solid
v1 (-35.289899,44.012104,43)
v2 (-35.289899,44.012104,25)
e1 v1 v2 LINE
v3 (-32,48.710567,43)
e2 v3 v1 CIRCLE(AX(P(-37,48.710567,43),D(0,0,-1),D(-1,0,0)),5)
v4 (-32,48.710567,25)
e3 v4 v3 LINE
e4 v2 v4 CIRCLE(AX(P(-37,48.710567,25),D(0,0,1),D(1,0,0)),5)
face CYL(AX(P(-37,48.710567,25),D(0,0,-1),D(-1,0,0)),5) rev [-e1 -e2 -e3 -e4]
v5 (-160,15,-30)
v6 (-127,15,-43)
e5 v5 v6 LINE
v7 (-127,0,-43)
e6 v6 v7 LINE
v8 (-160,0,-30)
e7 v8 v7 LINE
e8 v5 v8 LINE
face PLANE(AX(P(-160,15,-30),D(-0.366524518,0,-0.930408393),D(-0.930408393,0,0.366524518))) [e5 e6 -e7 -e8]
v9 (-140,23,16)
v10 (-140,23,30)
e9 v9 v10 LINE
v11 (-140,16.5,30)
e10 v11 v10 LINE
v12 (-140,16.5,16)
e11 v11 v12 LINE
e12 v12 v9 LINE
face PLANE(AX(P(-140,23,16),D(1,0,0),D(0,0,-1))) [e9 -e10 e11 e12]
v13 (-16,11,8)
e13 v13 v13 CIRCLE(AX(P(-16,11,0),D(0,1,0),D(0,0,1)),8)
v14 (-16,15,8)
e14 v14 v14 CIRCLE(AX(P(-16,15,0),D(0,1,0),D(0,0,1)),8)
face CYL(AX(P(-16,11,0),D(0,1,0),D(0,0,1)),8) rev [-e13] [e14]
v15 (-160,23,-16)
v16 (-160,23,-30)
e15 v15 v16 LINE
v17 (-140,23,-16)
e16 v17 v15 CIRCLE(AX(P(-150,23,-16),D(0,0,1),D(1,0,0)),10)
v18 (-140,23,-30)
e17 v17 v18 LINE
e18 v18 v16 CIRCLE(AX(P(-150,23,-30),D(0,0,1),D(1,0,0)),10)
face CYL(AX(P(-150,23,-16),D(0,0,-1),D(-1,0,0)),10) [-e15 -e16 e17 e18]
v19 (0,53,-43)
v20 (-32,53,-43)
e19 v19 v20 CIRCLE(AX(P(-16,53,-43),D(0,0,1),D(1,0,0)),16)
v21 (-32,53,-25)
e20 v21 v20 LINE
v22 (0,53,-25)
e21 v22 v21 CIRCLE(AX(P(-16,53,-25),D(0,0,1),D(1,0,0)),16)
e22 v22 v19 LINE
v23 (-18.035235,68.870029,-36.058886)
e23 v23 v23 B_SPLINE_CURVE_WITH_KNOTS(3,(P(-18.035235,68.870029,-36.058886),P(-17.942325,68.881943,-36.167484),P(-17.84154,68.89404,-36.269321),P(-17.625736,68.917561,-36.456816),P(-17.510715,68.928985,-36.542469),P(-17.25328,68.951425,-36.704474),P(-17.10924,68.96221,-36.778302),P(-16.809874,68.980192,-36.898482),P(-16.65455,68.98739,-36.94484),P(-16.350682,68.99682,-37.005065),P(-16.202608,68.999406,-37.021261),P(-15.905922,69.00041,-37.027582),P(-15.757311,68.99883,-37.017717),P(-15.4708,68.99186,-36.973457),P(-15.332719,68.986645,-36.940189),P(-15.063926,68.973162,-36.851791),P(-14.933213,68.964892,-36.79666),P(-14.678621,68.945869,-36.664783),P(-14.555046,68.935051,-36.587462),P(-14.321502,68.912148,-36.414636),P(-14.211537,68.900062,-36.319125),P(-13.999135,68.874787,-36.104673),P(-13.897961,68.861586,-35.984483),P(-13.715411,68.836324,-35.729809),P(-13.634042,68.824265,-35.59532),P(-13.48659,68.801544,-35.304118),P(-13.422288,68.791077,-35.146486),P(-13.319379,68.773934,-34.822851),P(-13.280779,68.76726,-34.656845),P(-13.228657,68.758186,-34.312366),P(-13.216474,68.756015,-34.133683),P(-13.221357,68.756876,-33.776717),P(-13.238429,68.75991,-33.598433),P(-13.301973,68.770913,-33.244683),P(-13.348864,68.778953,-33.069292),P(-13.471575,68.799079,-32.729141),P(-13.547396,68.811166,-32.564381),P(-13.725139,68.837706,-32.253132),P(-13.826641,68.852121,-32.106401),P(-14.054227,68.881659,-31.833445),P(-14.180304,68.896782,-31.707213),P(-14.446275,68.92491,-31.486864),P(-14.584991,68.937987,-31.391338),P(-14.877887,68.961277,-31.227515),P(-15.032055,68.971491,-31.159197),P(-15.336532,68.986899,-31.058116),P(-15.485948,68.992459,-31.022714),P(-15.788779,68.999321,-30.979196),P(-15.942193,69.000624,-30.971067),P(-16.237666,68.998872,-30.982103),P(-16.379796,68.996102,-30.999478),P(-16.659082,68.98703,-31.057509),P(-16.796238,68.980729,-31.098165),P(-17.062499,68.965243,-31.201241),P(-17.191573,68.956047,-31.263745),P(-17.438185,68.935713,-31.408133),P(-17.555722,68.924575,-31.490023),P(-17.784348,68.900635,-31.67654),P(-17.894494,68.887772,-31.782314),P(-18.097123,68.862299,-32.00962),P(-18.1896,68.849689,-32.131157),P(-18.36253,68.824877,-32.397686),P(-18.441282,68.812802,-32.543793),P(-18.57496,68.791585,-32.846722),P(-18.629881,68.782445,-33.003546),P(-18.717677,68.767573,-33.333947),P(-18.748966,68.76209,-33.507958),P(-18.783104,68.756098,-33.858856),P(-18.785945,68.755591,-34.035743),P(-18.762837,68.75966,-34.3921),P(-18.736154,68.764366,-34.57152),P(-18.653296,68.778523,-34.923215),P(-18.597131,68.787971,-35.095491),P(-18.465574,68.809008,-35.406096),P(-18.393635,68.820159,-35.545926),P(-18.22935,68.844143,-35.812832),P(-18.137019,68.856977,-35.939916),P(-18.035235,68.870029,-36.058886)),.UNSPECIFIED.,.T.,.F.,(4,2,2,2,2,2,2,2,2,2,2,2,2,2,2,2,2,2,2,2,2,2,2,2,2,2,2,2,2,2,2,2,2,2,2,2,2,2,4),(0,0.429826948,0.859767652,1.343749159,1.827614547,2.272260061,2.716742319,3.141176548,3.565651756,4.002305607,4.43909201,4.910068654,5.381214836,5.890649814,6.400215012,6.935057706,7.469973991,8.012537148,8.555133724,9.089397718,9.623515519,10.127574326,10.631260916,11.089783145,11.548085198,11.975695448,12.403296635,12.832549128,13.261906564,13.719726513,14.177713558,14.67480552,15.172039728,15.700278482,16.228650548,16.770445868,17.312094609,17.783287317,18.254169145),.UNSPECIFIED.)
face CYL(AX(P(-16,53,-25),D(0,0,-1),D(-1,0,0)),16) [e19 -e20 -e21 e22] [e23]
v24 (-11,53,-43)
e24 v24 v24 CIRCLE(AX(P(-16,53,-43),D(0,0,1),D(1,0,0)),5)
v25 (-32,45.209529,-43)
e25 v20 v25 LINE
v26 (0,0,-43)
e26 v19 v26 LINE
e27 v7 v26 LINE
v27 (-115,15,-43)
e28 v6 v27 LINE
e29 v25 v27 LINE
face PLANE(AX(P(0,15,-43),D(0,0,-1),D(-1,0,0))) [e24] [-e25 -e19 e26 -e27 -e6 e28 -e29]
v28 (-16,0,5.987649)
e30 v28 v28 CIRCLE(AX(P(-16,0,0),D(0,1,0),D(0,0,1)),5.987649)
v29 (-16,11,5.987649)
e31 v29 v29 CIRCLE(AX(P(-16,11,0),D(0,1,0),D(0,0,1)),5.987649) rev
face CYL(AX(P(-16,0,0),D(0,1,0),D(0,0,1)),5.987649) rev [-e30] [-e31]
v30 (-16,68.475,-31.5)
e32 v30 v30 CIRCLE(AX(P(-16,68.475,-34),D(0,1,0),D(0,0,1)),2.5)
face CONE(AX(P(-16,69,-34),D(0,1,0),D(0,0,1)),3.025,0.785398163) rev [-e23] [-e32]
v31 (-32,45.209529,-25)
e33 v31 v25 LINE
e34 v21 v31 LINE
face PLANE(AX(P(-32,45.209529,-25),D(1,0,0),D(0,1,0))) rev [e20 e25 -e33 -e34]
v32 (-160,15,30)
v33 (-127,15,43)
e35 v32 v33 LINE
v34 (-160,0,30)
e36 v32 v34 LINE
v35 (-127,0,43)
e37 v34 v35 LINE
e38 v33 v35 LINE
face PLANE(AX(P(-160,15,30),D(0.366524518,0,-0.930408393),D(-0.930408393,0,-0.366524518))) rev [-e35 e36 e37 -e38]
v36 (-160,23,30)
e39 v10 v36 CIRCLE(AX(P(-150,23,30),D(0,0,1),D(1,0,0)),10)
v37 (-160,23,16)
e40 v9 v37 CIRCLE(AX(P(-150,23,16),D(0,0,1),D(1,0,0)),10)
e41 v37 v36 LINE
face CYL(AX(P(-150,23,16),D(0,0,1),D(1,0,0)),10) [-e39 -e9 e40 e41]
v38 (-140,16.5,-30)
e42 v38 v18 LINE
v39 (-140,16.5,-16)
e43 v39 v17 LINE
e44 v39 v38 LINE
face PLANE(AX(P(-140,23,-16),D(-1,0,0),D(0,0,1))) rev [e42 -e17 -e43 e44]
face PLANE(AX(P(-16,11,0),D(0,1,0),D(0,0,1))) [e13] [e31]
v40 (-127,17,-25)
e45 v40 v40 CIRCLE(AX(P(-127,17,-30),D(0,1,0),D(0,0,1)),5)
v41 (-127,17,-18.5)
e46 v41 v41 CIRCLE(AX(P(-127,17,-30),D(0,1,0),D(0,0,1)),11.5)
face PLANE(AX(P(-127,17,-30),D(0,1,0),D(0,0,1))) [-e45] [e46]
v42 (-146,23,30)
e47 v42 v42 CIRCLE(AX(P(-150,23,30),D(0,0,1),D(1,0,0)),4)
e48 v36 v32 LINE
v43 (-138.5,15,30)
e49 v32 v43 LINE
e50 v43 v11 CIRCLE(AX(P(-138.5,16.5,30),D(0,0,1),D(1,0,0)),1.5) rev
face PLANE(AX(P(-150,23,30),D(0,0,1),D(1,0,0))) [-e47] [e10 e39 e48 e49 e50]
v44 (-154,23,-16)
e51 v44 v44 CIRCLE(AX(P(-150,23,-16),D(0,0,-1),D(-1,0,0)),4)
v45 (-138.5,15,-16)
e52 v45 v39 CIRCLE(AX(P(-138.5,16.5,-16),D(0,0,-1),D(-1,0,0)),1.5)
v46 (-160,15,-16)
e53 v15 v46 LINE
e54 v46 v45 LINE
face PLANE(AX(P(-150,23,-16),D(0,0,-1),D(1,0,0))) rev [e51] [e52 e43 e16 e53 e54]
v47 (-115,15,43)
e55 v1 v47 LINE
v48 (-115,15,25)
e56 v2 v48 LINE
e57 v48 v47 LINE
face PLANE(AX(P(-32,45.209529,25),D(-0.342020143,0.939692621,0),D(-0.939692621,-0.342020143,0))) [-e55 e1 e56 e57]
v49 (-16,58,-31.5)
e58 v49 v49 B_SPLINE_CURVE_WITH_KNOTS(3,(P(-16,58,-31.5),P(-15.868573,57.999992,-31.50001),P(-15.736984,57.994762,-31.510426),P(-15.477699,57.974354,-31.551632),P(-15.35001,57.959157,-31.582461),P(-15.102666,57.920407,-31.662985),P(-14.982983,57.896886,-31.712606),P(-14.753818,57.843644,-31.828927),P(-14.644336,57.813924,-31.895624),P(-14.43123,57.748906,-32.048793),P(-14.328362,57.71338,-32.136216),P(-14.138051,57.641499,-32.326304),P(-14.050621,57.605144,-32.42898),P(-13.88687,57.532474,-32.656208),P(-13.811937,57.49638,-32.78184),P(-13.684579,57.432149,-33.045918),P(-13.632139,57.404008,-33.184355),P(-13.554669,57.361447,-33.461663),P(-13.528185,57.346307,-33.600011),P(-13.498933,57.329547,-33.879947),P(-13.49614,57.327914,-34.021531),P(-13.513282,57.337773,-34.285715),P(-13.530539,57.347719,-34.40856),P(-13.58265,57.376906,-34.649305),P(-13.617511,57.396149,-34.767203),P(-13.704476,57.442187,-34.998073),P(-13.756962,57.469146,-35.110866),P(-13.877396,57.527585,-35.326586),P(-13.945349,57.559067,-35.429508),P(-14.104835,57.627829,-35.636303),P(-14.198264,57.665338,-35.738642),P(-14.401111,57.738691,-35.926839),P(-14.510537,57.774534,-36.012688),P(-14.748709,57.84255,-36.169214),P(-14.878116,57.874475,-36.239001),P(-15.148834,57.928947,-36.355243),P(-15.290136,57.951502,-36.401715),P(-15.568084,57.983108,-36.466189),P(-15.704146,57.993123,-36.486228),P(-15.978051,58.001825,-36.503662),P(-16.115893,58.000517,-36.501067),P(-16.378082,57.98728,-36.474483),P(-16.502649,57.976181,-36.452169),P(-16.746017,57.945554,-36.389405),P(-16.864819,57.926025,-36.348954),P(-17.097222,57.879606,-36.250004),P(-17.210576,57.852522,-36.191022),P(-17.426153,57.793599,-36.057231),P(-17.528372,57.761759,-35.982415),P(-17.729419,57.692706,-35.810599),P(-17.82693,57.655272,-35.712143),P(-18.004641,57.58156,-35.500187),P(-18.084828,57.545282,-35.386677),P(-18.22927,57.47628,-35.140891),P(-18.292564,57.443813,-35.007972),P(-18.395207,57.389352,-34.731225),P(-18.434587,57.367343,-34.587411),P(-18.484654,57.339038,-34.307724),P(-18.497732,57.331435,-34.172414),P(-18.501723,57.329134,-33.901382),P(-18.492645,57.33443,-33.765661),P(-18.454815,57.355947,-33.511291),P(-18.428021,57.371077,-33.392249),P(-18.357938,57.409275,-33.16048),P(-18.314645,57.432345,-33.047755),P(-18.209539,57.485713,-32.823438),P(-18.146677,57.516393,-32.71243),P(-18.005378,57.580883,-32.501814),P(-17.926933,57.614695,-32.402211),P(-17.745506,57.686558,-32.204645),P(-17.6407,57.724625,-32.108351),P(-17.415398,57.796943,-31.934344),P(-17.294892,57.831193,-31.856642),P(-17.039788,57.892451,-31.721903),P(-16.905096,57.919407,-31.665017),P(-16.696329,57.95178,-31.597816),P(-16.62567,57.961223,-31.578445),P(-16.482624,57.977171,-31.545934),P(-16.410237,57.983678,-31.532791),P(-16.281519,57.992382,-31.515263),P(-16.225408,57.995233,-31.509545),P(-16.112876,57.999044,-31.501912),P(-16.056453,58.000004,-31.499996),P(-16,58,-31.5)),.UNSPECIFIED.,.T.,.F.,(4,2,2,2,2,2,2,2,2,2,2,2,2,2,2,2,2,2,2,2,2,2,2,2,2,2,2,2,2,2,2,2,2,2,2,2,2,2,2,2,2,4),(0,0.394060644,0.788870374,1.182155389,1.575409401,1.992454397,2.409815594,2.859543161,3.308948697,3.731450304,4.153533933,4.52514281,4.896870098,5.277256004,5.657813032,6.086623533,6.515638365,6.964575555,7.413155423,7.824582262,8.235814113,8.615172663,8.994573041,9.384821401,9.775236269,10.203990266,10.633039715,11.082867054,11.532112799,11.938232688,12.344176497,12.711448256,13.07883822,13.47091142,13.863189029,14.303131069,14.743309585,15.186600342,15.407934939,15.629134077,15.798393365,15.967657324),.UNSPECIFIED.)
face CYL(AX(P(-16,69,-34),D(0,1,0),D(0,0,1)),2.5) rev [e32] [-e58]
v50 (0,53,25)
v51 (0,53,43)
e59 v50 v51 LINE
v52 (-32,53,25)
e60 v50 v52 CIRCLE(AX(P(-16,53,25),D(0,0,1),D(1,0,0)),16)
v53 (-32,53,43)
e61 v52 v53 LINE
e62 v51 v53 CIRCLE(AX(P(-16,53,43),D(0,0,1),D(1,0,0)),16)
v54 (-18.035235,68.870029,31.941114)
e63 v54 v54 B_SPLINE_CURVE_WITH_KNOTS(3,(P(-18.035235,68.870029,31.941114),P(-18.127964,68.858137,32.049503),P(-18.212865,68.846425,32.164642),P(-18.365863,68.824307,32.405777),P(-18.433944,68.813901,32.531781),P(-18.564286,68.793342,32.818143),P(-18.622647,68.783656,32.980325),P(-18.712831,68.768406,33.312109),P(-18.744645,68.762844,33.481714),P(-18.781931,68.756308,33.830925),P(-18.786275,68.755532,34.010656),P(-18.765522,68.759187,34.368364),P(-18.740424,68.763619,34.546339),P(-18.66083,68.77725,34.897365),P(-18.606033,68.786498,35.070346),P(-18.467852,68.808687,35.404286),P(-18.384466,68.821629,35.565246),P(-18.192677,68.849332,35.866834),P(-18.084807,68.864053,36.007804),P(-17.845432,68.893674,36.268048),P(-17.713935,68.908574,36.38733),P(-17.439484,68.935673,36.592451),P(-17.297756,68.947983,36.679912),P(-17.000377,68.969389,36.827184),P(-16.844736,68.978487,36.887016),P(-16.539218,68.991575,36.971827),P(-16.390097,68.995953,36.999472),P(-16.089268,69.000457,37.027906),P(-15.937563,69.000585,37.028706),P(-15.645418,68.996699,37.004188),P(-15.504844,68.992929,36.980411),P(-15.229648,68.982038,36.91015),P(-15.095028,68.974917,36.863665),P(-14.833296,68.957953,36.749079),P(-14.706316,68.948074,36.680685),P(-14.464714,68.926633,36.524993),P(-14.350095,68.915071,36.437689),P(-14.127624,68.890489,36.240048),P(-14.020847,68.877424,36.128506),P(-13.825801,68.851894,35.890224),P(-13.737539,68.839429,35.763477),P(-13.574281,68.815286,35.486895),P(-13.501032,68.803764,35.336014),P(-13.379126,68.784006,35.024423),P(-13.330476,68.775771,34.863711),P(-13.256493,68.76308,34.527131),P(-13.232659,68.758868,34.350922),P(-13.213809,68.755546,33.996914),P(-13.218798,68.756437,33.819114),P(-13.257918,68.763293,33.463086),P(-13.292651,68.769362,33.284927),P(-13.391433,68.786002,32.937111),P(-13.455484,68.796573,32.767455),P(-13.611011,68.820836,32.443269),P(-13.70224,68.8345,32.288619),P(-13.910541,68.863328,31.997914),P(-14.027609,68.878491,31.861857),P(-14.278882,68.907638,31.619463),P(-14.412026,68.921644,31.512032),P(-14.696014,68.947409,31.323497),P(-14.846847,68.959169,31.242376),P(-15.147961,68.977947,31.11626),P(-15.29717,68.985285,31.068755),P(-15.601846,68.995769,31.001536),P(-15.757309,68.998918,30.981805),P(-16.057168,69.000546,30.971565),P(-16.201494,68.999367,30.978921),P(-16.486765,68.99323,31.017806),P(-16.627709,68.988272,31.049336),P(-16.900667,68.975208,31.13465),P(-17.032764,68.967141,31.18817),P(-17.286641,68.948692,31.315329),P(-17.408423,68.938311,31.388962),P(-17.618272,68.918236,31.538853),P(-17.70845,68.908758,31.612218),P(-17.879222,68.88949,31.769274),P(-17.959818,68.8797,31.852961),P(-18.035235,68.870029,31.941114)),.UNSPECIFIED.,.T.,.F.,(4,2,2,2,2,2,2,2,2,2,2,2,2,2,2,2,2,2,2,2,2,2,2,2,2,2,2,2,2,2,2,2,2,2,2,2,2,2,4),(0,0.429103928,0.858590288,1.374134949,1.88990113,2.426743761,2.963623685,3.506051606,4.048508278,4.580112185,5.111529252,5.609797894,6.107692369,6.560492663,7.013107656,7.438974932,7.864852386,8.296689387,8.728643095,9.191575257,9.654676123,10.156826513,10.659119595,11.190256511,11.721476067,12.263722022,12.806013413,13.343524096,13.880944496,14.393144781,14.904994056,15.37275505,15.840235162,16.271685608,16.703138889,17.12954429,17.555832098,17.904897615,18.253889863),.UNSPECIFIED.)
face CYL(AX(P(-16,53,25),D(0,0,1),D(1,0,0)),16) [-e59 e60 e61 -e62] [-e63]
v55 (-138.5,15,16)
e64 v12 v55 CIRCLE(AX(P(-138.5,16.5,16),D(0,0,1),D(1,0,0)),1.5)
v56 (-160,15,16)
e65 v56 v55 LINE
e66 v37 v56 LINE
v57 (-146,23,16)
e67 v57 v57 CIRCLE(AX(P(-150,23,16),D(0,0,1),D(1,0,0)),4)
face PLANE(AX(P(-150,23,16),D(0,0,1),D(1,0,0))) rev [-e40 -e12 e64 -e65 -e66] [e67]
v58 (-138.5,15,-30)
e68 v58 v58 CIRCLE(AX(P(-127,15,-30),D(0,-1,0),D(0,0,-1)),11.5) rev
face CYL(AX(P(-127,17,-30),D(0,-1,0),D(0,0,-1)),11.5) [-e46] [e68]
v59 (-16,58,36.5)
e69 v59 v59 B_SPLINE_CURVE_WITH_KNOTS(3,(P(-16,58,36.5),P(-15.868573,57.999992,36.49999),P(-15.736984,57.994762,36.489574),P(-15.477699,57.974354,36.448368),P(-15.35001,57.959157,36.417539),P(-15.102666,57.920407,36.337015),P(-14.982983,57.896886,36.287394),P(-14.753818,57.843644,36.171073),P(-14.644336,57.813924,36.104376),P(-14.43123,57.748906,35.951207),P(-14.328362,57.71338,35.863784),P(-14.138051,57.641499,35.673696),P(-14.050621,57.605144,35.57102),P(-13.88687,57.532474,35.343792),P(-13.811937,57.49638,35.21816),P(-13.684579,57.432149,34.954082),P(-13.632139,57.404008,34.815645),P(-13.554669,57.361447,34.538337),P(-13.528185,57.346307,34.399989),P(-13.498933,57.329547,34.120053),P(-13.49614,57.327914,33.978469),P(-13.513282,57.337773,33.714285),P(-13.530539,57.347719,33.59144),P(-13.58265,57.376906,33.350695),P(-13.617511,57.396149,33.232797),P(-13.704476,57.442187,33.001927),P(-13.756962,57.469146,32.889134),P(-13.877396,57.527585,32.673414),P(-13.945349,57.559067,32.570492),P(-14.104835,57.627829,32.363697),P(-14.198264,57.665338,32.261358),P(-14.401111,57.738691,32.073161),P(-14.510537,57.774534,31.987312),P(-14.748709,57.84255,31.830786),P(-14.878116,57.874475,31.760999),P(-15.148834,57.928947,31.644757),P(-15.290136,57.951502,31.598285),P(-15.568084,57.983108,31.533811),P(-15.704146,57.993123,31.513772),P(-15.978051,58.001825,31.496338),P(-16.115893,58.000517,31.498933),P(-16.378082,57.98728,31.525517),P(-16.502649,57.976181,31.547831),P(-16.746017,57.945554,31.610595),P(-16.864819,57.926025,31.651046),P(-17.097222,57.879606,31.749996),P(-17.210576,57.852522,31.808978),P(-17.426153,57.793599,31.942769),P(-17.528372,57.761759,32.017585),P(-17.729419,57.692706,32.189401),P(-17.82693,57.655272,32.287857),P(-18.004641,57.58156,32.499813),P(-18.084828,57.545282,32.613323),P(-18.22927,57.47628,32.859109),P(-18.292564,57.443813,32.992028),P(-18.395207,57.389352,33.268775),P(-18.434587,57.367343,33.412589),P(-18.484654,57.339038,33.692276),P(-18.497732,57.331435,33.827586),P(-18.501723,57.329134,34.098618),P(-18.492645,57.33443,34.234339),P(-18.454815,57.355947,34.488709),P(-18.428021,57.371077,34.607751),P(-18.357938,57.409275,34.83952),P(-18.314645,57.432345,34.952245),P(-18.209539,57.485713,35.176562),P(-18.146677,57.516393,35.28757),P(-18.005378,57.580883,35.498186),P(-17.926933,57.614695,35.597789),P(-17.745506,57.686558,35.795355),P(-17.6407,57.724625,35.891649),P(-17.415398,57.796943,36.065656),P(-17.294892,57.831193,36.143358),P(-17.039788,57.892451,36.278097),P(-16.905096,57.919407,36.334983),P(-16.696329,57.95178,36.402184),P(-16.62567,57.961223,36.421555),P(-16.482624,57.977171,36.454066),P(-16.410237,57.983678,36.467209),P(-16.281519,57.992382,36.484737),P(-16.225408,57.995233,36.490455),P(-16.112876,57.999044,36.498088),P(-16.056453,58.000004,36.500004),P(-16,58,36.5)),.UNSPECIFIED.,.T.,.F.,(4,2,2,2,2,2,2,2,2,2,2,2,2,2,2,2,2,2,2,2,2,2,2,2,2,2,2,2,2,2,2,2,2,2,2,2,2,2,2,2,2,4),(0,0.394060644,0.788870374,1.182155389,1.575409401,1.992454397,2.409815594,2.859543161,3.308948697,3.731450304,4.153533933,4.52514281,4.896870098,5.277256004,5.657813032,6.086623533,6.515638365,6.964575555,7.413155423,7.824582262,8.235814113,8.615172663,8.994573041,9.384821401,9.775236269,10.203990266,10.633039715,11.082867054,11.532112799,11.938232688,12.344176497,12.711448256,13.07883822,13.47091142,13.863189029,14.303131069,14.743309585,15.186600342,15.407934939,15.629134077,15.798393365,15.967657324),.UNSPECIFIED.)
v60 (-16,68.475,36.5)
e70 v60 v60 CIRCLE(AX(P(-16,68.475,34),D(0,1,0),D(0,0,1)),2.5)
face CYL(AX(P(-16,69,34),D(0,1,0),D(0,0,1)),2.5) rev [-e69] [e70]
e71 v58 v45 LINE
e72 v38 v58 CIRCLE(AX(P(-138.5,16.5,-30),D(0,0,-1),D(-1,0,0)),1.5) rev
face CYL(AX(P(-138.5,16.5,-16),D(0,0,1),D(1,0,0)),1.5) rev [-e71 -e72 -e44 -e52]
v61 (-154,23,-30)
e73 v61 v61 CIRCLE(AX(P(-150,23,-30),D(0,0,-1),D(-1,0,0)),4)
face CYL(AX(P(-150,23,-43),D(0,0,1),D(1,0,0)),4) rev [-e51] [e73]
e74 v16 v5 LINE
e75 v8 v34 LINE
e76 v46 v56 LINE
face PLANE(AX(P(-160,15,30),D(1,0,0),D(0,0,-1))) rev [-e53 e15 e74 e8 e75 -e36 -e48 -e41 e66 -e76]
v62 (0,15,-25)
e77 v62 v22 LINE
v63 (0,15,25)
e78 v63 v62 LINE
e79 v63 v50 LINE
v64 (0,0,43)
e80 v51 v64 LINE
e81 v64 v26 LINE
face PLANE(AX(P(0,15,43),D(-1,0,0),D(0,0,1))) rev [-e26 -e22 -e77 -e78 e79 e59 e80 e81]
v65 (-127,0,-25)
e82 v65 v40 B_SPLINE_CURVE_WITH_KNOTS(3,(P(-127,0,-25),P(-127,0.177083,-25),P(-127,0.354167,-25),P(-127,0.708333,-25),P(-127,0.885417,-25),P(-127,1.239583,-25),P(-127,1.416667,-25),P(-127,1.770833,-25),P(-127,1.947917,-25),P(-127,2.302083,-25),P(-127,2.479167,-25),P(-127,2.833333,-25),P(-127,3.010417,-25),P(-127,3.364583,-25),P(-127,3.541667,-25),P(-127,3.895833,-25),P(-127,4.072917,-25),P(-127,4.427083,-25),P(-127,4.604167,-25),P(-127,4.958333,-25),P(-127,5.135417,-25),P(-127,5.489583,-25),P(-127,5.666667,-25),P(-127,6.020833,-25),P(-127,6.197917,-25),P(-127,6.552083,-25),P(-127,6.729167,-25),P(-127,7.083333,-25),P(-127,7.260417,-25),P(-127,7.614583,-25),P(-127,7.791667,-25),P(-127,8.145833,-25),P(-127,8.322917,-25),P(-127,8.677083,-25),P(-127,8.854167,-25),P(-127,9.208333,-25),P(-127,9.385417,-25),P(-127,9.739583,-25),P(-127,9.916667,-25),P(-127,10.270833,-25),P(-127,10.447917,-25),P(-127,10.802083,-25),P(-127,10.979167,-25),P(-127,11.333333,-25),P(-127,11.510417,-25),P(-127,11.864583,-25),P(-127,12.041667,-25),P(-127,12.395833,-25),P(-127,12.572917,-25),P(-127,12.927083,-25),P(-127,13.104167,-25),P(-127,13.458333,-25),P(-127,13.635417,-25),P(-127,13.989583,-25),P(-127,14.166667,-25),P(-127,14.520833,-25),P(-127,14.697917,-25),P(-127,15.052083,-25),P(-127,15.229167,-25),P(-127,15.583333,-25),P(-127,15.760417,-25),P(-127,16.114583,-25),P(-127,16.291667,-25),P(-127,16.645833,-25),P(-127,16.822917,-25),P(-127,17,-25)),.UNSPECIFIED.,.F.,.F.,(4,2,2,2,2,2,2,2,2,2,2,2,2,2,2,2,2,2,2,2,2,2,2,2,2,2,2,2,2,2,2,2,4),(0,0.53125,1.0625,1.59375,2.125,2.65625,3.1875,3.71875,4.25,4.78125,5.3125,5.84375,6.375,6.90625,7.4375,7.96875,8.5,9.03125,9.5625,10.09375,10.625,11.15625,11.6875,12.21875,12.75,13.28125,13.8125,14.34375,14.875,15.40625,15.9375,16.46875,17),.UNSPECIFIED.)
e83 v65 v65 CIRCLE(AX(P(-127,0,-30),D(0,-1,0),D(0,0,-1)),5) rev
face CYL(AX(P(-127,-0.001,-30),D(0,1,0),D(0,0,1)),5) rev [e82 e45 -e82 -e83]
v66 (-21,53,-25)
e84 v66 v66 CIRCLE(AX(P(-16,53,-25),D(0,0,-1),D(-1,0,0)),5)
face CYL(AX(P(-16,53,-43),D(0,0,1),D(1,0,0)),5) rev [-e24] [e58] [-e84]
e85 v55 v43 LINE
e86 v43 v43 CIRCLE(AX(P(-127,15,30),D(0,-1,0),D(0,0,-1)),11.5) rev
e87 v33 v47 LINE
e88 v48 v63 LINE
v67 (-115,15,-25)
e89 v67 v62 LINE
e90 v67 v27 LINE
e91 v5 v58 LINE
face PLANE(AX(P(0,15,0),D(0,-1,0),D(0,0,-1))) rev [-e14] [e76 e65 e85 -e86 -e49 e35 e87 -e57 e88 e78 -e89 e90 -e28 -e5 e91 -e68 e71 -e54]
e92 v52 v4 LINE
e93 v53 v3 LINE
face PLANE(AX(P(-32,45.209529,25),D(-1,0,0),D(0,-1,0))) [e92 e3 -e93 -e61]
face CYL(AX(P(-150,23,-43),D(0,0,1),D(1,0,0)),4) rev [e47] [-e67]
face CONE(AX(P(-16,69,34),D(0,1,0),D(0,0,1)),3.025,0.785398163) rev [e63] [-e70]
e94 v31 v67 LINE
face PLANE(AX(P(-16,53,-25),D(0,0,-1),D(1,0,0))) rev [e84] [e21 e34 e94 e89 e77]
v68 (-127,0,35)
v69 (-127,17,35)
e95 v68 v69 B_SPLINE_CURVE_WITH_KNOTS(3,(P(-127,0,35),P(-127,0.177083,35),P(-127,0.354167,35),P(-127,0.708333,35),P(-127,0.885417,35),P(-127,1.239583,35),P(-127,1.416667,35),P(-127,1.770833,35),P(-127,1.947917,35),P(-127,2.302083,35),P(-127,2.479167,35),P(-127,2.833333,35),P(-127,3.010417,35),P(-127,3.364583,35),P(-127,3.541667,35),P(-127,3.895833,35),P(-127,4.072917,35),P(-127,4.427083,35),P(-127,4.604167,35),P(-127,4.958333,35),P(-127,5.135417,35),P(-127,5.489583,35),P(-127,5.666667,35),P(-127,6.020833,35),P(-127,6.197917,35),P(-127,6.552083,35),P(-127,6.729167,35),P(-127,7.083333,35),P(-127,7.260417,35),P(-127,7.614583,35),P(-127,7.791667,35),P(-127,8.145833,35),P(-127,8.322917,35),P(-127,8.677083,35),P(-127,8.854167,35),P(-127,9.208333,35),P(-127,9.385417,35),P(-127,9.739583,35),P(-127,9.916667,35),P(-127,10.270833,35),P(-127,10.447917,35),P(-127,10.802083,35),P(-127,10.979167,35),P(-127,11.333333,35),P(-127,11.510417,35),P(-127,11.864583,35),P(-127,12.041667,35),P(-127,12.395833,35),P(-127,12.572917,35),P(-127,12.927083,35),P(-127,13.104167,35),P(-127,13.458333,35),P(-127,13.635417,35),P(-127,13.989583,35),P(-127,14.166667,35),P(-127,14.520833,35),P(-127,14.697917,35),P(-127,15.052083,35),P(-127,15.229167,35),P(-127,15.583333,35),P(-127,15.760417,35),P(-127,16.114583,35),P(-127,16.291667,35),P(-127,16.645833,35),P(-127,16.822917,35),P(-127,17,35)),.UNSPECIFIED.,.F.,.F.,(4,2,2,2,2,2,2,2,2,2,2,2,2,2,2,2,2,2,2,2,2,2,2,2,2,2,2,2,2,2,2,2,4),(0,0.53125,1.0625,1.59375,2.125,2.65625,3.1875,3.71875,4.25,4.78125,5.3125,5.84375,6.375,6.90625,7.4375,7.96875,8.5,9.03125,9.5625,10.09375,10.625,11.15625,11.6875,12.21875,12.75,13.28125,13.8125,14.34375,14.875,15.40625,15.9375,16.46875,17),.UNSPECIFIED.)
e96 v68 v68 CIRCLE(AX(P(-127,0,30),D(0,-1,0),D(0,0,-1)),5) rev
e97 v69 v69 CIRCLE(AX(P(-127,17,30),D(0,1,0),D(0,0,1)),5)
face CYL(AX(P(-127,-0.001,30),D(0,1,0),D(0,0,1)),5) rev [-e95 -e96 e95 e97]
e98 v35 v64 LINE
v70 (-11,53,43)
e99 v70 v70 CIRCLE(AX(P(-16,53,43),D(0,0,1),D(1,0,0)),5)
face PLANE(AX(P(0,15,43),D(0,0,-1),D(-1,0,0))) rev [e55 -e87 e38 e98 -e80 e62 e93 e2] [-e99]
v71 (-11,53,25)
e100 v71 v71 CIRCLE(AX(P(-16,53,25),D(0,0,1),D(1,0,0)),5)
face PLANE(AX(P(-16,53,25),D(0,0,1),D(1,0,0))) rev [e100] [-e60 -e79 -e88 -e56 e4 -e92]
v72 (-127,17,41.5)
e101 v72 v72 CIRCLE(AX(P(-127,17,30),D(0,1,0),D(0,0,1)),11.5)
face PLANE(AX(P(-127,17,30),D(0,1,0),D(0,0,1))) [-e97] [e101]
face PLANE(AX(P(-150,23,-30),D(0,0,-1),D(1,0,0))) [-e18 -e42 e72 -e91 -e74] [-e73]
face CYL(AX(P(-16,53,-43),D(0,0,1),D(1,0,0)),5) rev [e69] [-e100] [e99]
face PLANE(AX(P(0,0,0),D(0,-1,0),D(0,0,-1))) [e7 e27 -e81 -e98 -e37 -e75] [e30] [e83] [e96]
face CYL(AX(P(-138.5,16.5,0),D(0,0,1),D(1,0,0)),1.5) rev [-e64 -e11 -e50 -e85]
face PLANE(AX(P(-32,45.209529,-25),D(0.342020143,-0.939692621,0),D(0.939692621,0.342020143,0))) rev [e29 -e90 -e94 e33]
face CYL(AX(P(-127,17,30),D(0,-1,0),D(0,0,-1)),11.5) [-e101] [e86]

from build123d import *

# Parameters (mm, degrees)
BOSS_EXTRU_1_DEPTH           = 15
BOSS_EXTRU_2_DEPTH           = 18
BOSS_EXTRU_3_DEPTH           = 14
CONG_1_R                     = 5
ENL_V_MAT_EXTRU_1_DEPTH      = 189.917971617
ENL_V_MAT_EXTRU_1_DEPTH_BACK = 189.917971617
ESQUISSE4_R                  = 4
ENL_V_MAT_EXTRU_2_DEPTH      = 195.311605418
ENL_V_MAT_EXTRU_2_DEPTH_BACK = 195.311605418
ESQUISSE5_R                  = 5
ENL_V_MAT_EXTRU_3_DEPTH      = 175.255559452
ENL_V_MAT_EXTRU_3_DEPTH_BACK = 175.255559452
ESQUISSE6_R                  = 5.987648709
ESQUISSE7_R                  = 8
ENL_V_MAT_EXTRU_4_DEPTH      = 4
ENL_V_MAT_EXTRU_5_REACH      = 176.256
ESQUISSE12_R                 = 5
BOSS_EXTRU_4_START           = 2
ESQUISSE13_R                 = 11.5
ESQUISSE13_R_2               = 5
BOSS_EXTRU_4_DEPTH           = 2
CONG_2_R                     = 1.5


# Read off the part's stored shape, not the designer's step: Trou taraudé M61
with BuildPart() as part:
    # Esquisse1 → Boss.-Extru.1 (new body)
    with BuildSketch(Plane(origin=(0, 0, 0), x_dir=(1, 0, 0), z_dir=(0, 1, 0))):
        Polygon((0, -43), (-127, -43), (-160, -30), (-160, 0), (0, 0), align=None)
    boss_extru_1 = extrude(amount=BOSS_EXTRU_1_DEPTH)

    # Esquisse2 → Boss.-Extru.2 (add)
    with BuildSketch(Plane.XY.offset(43)):
        with BuildLine():
            Line((-32, 45.209529444), (-32, 53))
            ThreePointArc((-32, 53), (-16, 69), (0, 53))
            Line((0, 53), (0, 15))
            Line((0, 15), (-115, 15))
            Line((-115, 15), (-32, 45.209529444))
        make_face()
    boss_extru_2 = extrude(amount=-BOSS_EXTRU_2_DEPTH)

    # Esquisse3 → Boss.-Extru.3 (add)
    with BuildSketch(Plane.XY.offset(30)):
        with BuildLine():
            Line((-140, 23), (-140, 15))
            Line((-140, 15), (-160, 15))
            Line((-160, 15), (-160, 23))
            ThreePointArc((-160, 23), (-150, 33), (-140, 23))
        make_face()
    boss_extru_3 = extrude(amount=-BOSS_EXTRU_3_DEPTH)

    # Congé1
    cong_1_edges = [part.edges().sort_by_distance(p)[0] for p in [
        (-32, 45.209529444, 34),
    ]]
    fillet(cong_1_edges, radius=CONG_1_R)

    # Symétrie1: Boss.-Extru.1, Boss.-Extru.2, Boss.-Extru.3 across plane
    add(boss_extru_1.mirror(Plane.XY))
    add(boss_extru_2.mirror(Plane.XY))
    add(boss_extru_3.mirror(Plane.XY))

    # Esquisse4 → Enlèv. mat.-Extru.1 (cut, two sides: drawn at the far end of the back side and taken through both)
    with BuildSketch(Plane.XY.offset(30).offset(-ENL_V_MAT_EXTRU_1_DEPTH_BACK)):
        with Locations(Location((-150, 23, 0), (0, 0, 180))):
            Circle(ESQUISSE4_R)
    extrude(amount=ENL_V_MAT_EXTRU_1_DEPTH + ENL_V_MAT_EXTRU_1_DEPTH_BACK, mode=Mode.SUBTRACT)

    # Esquisse5 → Enlèv. mat.-Extru.2 (cut, two sides: drawn at the far end of the back side and taken through both)
    with BuildSketch(Plane.XY.offset(43).offset(-ENL_V_MAT_EXTRU_2_DEPTH_BACK)):
        with Locations((-16, 53)):
            Circle(ESQUISSE5_R)
    extrude(amount=ENL_V_MAT_EXTRU_2_DEPTH + ENL_V_MAT_EXTRU_2_DEPTH_BACK, mode=Mode.SUBTRACT)

    # Esquisse6 → Enlèv. mat.-Extru.3 (cut, two sides: drawn at the far end of the back side and taken through both)
    with BuildSketch(Plane(origin=(0, 15, 0), x_dir=(1, 0, 0), z_dir=(0, 1, 0)).offset(-ENL_V_MAT_EXTRU_3_DEPTH_BACK)):
        with Locations(Location((-16, 0, 0), (0, 0, 270))):
            Circle(ESQUISSE6_R)
    extrude(amount=ENL_V_MAT_EXTRU_3_DEPTH + ENL_V_MAT_EXTRU_3_DEPTH_BACK, mode=Mode.SUBTRACT)

    # Esquisse7 → Enlèv. mat.-Extru.4 (cut)
    with BuildSketch(Plane(origin=(0, 15, 0), x_dir=(1, 0, 0), z_dir=(0, 1, 0))):
        with Locations(Location((-16, 0, 0), (0, 0, 270))):
            Circle(ESQUISSE7_R)
    extrude(amount=-ENL_V_MAT_EXTRU_4_DEPTH, mode=Mode.SUBTRACT)

    # Trou taraudé M61 outline → Trou taraudé M61 (revolve, cut)
    with BuildSketch(Plane(origin=(-16, 0, 34), x_dir=(1, 0, 0), z_dir=(0, 0, 1))):
        Polygon((0, 57.329808988), (2.5, 57.329808988), (2.5, 68.475), (3.02508907, 69.00008907), (0, 69.00008907), align=None)
    revolve(axis=Axis((-16, 0, 34), (0, 1, 0)), mode=Mode.SUBTRACT)

    # Trou taraud_ M61 2 outline → Trou taraud_ M61 2 (revolve, cut)
    with BuildSketch(Plane(origin=(-16, 0, -34), x_dir=(1, 0, 0), z_dir=(0, 0, 1))):
        Polygon((3.025080927, 69.000080927), (0, 69.000080927), (0, 57.329808988), (2.5, 57.329808988), (2.5, 68.475), align=None)
    revolve(axis=Axis((-16, 0, -34), (0, 1, 0)), mode=Mode.SUBTRACT)

    # Esquisse12 → Enlèv. mat.-Extru.5 (cut, up to next)
    with BuildSketch(Plane(origin=(0, 15, 0), x_dir=(1, 0, 0), z_dir=(0, 1, 0)), mode=Mode.PRIVATE) as enl_v_mat_extru_5_sk1:
        with Locations(Location((-127, -30, 0), (0, 0, 270))):
            Circle(ESQUISSE12_R)
    enl_v_mat_extru_5_tool1 = extrude(enl_v_mat_extru_5_sk1.sketch, amount=-ENL_V_MAT_EXTRU_5_REACH, mode=Mode.PRIVATE) & part.part
    # Esquisse12 → Enlèv. mat.-Extru.5 (cut, up to next)
    with BuildSketch(Plane(origin=(0, 15, 0), x_dir=(1, 0, 0), z_dir=(0, 1, 0)), mode=Mode.PRIVATE) as enl_v_mat_extru_5_sk2:
        with Locations(Location((-127, 30, 0), (0, 0, 270))):
            Circle(ESQUISSE12_R)
    enl_v_mat_extru_5_tool2 = extrude(enl_v_mat_extru_5_sk2.sketch, amount=-ENL_V_MAT_EXTRU_5_REACH, mode=Mode.PRIVATE) & part.part
    add(enl_v_mat_extru_5_tool1.solids().sort_by_distance((-127, 15, 30))[0], mode=Mode.SUBTRACT)
    add(enl_v_mat_extru_5_tool2.solids().sort_by_distance((-127, 15, -30))[0], mode=Mode.SUBTRACT)

    # Esquisse13 → Boss.-Extru.4 (add)
    # profile 1 of 2: a face of its own
    with BuildSketch(Plane(origin=(0, 15, 0), x_dir=(1, 0, 0), z_dir=(0, 1, 0)).offset(BOSS_EXTRU_4_START)):
        with Locations(Location((-127, -30, 0), (0, 0, 90))):
            Circle(ESQUISSE13_R)
        with Locations(Location((-127, -30, 0), (0, 0, 270))):
            Circle(ESQUISSE13_R_2, mode=Mode.SUBTRACT)
    # profile 2 of 2: a face of its own
    with BuildSketch(Plane(origin=(0, 15, 0), x_dir=(1, 0, 0), z_dir=(0, 1, 0)).offset(BOSS_EXTRU_4_START)):
        with Locations(Location((-127, 30, 0), (0, 0, 90))):
            Circle(ESQUISSE13_R)
        with Locations(Location((-127, 30, 0), (0, 0, 270))):
            Circle(ESQUISSE13_R_2, mode=Mode.SUBTRACT)
    extrude(amount=-BOSS_EXTRU_4_DEPTH)

    # Congé2
    cong_2_edges = [part.edges().sort_by_distance(p)[0] for p in [
        (-140, 15, 23),
        (-140, 15, -23),
    ]]
    fillet(cong_2_edges, radius=CONG_2_R - 0.0001)  # a hair under: the kernel refuses the full size


solid = part.part
